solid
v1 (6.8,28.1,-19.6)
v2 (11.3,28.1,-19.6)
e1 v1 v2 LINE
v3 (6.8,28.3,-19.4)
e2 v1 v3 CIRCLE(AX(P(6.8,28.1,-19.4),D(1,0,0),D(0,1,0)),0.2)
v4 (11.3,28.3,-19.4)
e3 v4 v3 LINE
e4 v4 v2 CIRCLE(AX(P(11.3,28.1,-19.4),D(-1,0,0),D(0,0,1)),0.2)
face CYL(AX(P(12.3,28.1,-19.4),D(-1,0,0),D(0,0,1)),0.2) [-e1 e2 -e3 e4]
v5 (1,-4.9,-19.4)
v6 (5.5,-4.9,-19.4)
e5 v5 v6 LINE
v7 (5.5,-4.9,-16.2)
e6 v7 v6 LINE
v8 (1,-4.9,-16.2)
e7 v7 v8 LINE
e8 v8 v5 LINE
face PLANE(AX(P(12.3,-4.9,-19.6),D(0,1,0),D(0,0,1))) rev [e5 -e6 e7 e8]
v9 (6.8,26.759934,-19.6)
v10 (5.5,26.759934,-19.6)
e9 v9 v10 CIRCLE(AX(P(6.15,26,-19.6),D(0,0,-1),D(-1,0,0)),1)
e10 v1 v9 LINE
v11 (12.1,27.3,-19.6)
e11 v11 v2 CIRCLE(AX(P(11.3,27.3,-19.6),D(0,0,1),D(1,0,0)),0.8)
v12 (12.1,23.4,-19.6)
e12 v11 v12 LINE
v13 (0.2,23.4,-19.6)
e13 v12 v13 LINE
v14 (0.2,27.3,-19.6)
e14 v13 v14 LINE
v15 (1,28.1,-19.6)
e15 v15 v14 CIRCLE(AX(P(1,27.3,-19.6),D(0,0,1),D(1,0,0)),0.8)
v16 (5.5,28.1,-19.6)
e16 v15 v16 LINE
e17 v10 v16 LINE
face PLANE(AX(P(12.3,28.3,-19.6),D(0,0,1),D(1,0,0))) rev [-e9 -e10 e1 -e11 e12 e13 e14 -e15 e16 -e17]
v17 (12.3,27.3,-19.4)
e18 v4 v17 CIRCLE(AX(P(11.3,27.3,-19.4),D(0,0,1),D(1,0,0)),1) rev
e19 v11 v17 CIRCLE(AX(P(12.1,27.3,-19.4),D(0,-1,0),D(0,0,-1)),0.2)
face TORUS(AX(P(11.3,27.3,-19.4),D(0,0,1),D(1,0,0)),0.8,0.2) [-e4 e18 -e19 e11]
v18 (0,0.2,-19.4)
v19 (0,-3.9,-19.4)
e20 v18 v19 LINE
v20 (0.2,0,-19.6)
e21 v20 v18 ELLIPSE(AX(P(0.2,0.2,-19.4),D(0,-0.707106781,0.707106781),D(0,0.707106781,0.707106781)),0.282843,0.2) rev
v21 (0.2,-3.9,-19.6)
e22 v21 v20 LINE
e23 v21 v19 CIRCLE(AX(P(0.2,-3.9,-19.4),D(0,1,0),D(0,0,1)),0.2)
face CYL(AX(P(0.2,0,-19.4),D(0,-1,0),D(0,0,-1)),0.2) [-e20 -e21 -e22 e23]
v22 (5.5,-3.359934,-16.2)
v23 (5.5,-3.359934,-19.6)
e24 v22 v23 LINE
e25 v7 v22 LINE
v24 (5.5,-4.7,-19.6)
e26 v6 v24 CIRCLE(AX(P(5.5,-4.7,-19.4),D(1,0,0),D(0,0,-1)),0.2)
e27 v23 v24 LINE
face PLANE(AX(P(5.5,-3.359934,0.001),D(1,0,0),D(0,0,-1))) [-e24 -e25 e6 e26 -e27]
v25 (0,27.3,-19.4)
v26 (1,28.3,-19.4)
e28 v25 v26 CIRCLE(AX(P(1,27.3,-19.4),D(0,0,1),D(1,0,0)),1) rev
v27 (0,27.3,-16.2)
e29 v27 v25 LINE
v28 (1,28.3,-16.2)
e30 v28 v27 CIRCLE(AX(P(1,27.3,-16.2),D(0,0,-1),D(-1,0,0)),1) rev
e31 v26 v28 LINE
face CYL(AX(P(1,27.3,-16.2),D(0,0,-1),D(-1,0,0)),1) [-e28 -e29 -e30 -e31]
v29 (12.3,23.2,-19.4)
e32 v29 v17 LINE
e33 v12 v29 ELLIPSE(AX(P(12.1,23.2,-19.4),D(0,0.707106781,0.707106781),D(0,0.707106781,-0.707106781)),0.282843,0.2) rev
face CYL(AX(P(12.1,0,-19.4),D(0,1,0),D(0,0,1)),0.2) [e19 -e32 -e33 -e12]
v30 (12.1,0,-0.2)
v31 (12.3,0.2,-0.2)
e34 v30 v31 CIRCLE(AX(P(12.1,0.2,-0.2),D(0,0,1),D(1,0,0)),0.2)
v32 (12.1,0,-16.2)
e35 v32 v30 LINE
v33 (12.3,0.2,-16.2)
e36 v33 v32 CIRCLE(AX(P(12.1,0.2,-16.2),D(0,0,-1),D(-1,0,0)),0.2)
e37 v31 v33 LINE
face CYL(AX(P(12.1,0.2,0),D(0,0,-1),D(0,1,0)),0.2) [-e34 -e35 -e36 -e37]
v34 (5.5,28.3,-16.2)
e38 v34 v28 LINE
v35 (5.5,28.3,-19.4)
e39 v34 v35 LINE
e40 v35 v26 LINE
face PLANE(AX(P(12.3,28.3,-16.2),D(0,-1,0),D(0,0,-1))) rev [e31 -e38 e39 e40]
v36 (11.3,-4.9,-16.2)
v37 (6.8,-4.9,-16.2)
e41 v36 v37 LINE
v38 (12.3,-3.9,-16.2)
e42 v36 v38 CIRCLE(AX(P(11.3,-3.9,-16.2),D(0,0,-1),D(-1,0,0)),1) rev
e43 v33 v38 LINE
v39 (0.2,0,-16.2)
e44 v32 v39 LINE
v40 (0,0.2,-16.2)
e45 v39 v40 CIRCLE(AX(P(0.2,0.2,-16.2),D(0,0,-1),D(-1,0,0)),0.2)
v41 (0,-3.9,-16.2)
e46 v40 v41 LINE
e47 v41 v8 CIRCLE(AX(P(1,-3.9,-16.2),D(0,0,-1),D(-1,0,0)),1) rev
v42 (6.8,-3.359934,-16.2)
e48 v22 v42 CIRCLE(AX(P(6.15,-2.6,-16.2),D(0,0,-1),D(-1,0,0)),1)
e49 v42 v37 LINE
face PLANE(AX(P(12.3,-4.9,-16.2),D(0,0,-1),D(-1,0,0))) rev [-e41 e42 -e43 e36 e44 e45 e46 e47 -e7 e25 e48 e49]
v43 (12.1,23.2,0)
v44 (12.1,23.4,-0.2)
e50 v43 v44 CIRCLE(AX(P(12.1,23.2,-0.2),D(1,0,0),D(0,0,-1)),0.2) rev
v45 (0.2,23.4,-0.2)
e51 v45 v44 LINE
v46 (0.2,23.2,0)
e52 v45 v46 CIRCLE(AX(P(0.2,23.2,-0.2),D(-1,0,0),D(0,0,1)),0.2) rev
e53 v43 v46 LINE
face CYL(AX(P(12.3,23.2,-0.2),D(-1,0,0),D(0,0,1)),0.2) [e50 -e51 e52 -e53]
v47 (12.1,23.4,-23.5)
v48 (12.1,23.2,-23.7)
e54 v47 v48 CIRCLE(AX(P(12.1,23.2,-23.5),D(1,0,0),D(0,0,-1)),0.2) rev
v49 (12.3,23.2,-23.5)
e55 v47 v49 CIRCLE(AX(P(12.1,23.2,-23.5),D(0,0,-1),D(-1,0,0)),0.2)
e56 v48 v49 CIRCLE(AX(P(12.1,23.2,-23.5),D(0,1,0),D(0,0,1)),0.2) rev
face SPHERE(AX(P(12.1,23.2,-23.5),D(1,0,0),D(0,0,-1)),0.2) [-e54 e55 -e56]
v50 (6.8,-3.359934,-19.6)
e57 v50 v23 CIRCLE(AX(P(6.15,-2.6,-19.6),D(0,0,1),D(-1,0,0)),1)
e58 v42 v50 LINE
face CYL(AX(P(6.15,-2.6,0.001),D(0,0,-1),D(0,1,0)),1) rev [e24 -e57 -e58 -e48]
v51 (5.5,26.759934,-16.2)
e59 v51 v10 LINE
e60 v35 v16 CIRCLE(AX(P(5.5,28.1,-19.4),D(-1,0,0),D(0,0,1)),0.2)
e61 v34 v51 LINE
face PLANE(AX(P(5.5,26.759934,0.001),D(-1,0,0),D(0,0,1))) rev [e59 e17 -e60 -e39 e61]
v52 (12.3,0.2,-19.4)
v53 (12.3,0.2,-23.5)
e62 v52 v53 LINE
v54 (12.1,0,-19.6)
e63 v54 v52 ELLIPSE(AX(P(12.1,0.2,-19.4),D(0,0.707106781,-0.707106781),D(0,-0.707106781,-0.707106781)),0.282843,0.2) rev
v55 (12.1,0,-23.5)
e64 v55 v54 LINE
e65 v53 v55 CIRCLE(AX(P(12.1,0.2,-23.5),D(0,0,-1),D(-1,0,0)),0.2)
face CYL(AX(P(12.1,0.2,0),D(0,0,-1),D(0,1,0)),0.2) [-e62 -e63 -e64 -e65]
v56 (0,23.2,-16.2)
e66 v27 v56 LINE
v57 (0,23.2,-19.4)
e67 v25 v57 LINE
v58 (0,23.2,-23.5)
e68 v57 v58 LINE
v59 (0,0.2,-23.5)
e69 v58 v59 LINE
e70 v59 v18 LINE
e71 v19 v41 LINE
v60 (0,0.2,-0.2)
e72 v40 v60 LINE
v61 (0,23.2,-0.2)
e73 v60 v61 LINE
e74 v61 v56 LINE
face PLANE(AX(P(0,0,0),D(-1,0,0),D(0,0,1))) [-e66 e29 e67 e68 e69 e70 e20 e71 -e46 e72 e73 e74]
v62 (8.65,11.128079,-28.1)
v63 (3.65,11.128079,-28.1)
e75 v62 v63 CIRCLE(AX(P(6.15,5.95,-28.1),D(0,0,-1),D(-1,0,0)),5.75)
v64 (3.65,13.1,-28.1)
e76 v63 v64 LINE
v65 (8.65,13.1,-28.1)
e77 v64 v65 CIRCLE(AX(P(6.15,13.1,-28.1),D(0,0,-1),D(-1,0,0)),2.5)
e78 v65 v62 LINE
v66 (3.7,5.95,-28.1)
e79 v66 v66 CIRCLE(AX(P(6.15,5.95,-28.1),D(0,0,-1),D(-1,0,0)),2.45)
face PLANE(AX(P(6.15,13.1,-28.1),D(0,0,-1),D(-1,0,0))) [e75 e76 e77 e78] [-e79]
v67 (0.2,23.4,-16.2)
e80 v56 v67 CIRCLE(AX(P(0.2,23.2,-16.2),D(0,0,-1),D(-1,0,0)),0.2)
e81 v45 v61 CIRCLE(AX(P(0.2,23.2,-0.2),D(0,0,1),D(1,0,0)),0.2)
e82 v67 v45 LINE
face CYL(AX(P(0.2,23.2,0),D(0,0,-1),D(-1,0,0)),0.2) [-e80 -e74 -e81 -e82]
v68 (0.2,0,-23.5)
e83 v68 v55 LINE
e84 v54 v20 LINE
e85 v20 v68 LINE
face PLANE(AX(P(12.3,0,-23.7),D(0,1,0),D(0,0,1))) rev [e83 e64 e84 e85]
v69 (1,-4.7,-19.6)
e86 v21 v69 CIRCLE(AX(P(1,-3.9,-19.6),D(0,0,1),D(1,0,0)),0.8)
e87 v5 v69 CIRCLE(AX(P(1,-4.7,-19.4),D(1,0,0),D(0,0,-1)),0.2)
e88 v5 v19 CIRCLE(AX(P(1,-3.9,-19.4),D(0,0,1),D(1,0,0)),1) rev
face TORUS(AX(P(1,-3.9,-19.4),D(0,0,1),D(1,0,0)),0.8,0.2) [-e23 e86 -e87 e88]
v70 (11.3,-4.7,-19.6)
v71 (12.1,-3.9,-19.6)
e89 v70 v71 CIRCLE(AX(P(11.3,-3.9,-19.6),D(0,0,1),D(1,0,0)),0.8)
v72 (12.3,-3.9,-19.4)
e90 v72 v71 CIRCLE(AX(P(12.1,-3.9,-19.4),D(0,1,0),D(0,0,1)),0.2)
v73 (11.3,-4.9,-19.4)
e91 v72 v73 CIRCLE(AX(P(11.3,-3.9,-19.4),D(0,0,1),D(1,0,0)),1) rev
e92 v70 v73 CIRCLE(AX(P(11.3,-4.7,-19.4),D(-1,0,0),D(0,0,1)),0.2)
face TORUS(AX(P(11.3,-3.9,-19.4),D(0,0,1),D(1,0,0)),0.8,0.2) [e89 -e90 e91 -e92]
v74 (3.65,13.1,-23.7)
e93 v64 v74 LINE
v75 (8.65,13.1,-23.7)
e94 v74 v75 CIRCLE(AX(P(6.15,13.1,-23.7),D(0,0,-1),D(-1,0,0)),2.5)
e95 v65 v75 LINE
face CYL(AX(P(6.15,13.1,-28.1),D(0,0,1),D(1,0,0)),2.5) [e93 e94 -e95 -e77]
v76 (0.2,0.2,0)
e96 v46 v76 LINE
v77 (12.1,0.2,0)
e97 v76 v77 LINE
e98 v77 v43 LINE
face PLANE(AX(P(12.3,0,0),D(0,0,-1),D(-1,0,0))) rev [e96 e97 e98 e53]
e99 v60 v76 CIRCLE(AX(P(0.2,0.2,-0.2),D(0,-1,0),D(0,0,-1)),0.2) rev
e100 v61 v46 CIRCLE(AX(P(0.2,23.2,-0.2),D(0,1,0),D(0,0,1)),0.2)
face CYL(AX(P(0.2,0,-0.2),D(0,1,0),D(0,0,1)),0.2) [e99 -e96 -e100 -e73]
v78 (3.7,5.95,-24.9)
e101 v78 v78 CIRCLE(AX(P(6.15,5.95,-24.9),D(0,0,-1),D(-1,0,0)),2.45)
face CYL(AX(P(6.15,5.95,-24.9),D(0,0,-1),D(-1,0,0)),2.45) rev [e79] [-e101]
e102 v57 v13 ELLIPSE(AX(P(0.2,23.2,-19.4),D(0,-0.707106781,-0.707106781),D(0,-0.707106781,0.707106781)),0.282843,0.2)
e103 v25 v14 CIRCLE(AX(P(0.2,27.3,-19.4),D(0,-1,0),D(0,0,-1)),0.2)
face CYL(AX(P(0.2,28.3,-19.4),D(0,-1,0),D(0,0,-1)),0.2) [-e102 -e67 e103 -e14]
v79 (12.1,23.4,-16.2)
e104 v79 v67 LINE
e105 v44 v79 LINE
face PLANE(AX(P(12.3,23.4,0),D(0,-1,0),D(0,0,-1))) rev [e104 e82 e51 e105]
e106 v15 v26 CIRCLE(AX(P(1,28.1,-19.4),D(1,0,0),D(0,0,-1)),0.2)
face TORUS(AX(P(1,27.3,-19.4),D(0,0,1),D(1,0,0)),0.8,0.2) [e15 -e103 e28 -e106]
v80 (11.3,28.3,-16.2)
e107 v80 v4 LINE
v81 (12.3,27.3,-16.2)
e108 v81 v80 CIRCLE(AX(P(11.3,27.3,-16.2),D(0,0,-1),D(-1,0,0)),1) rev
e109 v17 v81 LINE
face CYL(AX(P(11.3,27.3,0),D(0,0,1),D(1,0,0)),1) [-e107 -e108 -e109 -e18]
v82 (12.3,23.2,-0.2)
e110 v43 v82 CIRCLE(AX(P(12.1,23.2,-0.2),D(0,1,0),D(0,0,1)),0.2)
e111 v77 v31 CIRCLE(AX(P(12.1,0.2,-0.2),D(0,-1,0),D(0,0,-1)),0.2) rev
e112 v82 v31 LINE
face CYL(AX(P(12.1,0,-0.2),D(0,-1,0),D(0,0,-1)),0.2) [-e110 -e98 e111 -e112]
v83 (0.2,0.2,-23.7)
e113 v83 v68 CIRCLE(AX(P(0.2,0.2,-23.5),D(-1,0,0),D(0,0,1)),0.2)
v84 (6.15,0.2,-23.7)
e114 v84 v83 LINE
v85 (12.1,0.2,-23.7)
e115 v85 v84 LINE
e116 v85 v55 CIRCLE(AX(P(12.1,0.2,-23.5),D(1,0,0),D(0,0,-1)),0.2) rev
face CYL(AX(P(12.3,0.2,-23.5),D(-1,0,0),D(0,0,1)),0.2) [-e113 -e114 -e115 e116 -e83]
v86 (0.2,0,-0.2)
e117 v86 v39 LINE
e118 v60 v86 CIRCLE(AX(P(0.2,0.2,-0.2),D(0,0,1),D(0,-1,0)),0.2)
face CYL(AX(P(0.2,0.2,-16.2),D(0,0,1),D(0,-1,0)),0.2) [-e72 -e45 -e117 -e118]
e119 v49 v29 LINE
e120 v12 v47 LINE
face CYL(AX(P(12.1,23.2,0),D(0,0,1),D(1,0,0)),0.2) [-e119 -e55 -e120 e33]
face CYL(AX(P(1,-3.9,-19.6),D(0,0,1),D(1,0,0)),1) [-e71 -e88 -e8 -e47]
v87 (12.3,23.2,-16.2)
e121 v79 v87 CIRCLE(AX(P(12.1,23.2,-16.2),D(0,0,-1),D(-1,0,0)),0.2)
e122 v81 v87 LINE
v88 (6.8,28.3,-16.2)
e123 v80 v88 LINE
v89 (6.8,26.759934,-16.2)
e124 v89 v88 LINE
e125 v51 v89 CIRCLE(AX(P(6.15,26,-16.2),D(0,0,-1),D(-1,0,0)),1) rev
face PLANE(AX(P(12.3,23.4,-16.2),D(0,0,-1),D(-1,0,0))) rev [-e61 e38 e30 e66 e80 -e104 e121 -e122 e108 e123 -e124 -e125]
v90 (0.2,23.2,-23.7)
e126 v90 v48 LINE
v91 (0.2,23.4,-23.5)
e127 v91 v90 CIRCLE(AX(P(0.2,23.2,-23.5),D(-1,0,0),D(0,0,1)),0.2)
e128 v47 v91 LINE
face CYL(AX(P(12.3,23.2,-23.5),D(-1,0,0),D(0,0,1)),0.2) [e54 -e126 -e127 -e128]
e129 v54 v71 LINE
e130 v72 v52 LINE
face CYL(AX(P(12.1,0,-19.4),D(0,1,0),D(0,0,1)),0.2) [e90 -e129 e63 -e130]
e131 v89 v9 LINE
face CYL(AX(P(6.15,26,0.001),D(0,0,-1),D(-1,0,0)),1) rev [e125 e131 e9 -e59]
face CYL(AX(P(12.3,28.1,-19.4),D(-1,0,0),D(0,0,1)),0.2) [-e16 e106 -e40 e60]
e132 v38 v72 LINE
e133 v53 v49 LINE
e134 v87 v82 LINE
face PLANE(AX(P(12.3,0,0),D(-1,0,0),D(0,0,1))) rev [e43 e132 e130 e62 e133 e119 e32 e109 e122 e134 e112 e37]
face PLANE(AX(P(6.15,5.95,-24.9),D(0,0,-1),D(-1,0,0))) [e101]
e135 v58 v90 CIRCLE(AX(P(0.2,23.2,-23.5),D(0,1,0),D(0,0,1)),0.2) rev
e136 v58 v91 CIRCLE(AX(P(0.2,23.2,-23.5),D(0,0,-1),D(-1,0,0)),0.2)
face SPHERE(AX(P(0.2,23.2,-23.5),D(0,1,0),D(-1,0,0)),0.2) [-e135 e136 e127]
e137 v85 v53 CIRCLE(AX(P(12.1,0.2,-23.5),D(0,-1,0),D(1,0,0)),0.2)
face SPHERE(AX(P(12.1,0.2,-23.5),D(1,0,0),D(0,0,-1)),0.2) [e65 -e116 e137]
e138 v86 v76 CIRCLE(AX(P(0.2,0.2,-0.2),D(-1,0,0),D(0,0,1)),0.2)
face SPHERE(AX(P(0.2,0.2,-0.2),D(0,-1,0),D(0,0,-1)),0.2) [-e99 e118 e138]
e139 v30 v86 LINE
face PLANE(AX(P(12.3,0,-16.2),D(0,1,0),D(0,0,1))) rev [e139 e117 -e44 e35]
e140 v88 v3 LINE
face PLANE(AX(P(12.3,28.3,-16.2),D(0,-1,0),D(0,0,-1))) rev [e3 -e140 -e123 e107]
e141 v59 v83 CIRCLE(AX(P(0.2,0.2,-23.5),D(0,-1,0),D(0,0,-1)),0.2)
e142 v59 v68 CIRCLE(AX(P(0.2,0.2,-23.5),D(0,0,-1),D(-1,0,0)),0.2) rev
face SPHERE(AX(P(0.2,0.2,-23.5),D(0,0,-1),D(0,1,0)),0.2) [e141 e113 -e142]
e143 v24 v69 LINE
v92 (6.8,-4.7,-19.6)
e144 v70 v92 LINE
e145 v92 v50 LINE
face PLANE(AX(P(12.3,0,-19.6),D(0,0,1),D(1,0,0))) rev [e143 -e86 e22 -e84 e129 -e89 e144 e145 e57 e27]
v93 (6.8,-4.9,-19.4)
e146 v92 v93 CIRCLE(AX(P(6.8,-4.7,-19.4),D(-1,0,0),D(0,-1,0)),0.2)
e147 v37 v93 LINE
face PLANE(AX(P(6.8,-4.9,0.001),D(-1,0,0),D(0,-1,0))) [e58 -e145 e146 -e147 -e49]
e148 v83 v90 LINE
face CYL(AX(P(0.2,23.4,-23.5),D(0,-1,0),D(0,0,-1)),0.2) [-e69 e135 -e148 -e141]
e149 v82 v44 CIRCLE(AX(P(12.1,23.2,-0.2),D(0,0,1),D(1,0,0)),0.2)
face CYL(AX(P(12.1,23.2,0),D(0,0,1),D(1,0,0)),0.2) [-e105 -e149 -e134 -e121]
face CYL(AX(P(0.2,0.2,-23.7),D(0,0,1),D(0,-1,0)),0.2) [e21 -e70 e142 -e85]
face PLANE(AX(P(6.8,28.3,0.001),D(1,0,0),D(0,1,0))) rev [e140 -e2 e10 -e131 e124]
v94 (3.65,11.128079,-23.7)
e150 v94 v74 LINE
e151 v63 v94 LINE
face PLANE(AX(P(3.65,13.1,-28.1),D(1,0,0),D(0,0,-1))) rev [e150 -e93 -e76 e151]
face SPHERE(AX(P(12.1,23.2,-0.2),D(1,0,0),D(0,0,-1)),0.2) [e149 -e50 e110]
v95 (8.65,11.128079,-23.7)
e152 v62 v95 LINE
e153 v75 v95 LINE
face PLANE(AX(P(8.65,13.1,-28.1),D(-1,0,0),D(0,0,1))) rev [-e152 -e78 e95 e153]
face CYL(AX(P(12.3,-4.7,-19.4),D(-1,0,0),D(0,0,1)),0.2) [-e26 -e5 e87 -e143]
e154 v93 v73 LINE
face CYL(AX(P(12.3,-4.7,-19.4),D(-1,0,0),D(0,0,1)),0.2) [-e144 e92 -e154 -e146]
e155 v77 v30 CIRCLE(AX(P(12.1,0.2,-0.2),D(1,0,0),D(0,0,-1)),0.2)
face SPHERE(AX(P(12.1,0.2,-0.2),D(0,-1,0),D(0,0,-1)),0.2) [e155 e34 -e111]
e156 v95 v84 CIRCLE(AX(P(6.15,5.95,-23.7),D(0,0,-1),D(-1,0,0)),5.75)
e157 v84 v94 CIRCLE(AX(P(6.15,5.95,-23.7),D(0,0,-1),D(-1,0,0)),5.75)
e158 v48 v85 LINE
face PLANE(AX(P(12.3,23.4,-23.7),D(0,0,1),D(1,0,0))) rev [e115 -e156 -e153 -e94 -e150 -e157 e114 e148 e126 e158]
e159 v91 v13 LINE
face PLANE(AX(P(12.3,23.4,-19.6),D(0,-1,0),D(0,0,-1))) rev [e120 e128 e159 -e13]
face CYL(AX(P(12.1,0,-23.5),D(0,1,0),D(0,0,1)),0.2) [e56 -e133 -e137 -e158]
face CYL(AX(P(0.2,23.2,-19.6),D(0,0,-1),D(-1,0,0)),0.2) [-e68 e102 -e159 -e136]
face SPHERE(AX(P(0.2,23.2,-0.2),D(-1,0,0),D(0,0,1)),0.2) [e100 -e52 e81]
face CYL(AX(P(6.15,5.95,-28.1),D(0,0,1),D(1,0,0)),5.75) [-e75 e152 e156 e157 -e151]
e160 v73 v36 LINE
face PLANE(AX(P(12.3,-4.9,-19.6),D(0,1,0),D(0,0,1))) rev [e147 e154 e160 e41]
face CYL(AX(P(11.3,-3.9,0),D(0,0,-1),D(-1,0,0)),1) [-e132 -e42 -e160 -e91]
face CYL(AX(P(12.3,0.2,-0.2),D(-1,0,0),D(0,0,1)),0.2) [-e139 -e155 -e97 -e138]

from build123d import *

# Parameters (mm, degrees)
DODANIE_WYCI_GNI_CIE1_DEPTH = 12.3
ZAOKR_GLENIE1_R             = 0.2
ZAOKR_GLENIE2_R             = 1
DODANIE_WYCI_GNI_CIE2_DEPTH = 4.4
SZKIC3_R                    = 2.45
WYTNIJ_WYCI_GNI_CIE1_DEPTH  = 3.2
WYTNIJ_WYCI_GNI_CIE2_REACH  = 38.556


with BuildPart() as part:
    # Szkic1 → Dodanie-wyciągnięcie1 (new body)
    with BuildSketch(Plane(origin=(0, 0, 0), x_dir=(0, 0, -1), z_dir=(1, 0, 0))):
        Polygon((0, 0), (0, 23.4), (16.2, 23.4), (16.2, 28.3), (19.6, 28.3), (19.6, 23.4), (23.7, 23.4), (23.7, 0), (19.6, 0), (19.6, -4.9), (16.2, -4.9), (16.2, 0), align=None)
    extrude(amount=DODANIE_WYCI_GNI_CIE1_DEPTH)

    # Zaokrąglenie1
    zaokr_glenie1_edges = [part.edges().sort_by_distance(p)[0] for p in [
        (0, 11.7, 0),
        (0, 23.4, -8.1),
        (0, 25.85, -19.6),
        (0, 23.4, -21.65),
        (0, 11.7, -23.7),
        (0, 0, -21.65),
        (0, -2.45, -19.6),
        (0, 0, -8.1),
        (12.3, -2.45, -19.6),
        (6.15, 0, 0),
        (6.15, 23.4, 0),
        (12.3, 0, -21.65),
        (6.15, 28.3, -19.6),
        (6.15, 23.4, -23.7),
        (6.15, 0, -23.7),
        (6.15, -4.9, -19.6),
        (12.3, 11.7, -23.7),
        (12.3, 23.4, -21.65),
        (12.3, 25.85, -19.6),
        (12.3, 23.4, -8.1),
        (12.3, 11.7, 0),
        (12.3, 0, -8.1),
    ]]
    fillet(zaokr_glenie1_edges, radius=ZAOKR_GLENIE1_R)

    # Zaokrąglenie2
    # the kernel refuses this fillet: 1 mm, written as the material it takes off along each edge
    with BuildSketch(Plane(origin=(11.3, 27.3, -19.6), x_dir=(0, 1, 0), z_dir=(-1, 0, 0))) as zaokr_glenie2_piece_1:
        with BuildLine():
            CenterArc((0.8, -0.2), 0.2, 0, 90)
            Line((1, -0.2), (1, 0))
            Line((1, 0), (0.8, 0))
        make_face()
    revolve(axis=Axis((11.3, 27.3, -19.6), (0, 0, -1)), revolution_arc=90, mode=Mode.SUBTRACT)
    with BuildSketch(Plane(origin=(1, 27.3, -19.6), x_dir=(-1, 0, 0), z_dir=(0, -1, 0))) as zaokr_glenie2_piece_2:
        with BuildLine():
            CenterArc((0.8, -0.2), 0.2, 0, 90)
            Line((1, -0.2), (1, 0))
            Line((1, 0), (0.8, 0))
        make_face()
    revolve(axis=Axis((1, 27.3, -19.6), (0, 0, -1)), revolution_arc=90, mode=Mode.SUBTRACT)
    with BuildSketch(Plane(origin=(11.3, -3.9, -19.6), x_dir=(1, 0, 0), z_dir=(0, 1, 0))) as zaokr_glenie2_piece_3:
        with BuildLine():
            CenterArc((0.8, -0.2), 0.2, 0, 90)
            Line((1, -0.2), (1, 0))
            Line((1, 0), (0.8, 0))
        make_face()
    revolve(axis=Axis((11.3, -3.9, -19.6), (0, 0, -1)), revolution_arc=90, mode=Mode.SUBTRACT)
    with BuildSketch(Plane(origin=(1, -3.9, -19.6), x_dir=(0, -1, 0), z_dir=(1, 0, 0))) as zaokr_glenie2_piece_4:
        with BuildLine():
            CenterArc((0.8, -0.2), 0.2, 0, 90)
            Line((1, -0.2), (1, 0))
            Line((1, 0), (0.8, 0))
        make_face()
    revolve(axis=Axis((1, -3.9, -19.6), (0, 0, -1)), revolution_arc=90, mode=Mode.SUBTRACT)
    with BuildSketch(Plane(origin=(12.3, -4.9, -19.6), x_dir=(-1, 0, 0), z_dir=(0, 0, 1)), Plane(origin=(0, -4.9, -19.6), x_dir=(0, 1, 0), z_dir=(0, 0, 1)), Plane(origin=(0, 28.3, -13.7), x_dir=(0, -1, 0), z_dir=(0, 0, -1)), Plane(origin=(12.3, 28.3, -13.7), x_dir=(-1, 0, 0), z_dir=(0, 0, -1))) as zaokr_glenie2_piece_5:
        with BuildLine():
            CenterArc((ZAOKR_GLENIE2_R, -ZAOKR_GLENIE2_R), ZAOKR_GLENIE2_R, 90, 90)
            Line((0, -ZAOKR_GLENIE2_R), (0, 0))
            Line((0, 0), (ZAOKR_GLENIE2_R, 0))
        make_face()
    extrude(amount=5.9, mode=Mode.SUBTRACT)

    # Szkic2 → Dodanie-wyciągnięcie2 (add)
    with BuildSketch(Plane(origin=(0, 0, -23.7), x_dir=(-1, 0, 0), z_dir=(0, 0, -1))):
        with BuildLine():
            Line((-3.65, 13.1), (-3.65, 11.128078794))
            ThreePointArc((-3.65, 11.128078794), (-6.15, 0.2), (-8.65, 11.128078794))
            Line((-8.65, 11.128078794), (-8.65, 13.1))
            ThreePointArc((-8.65, 13.1), (-6.15, 15.6), (-3.65, 13.1))
        make_face()
    extrude(amount=DODANIE_WYCI_GNI_CIE2_DEPTH)

    # Szkic3 → Wytnij-wyciągnięcie1 (cut)
    with BuildSketch(Plane(origin=(0, 0, -28.1), x_dir=(-1, 0, 0), z_dir=(0, 0, -1))):
        with Locations((-6.15, 5.95)):
            Circle(SZKIC3_R)
    extrude(amount=-WYTNIJ_WYCI_GNI_CIE1_DEPTH, mode=Mode.SUBTRACT)

    # Szkic5 → Wytnij-wyciągnięcie2 (cut, up to next)
    with BuildSketch(Plane(origin=(0, 0, -19.6), x_dir=(-1, 0, 0), z_dir=(0, 0, -1)), mode=Mode.PRIVATE) as wytnij_wyci_gni_cie2_sk1:
        with BuildLine():
            Line((-5.5, 26.759934208), (-5.5, 28.3))
            Line((-5.5, 28.3), (-6.8, 28.3))
            Line((-6.8, 28.3), (-6.8, 26.759934208))
            ThreePointArc((-6.8, 26.759934208), (-6.15, 25), (-5.5, 26.759934208))
        make_face()
    wytnij_wyci_gni_cie2_tool1 = extrude(wytnij_wyci_gni_cie2_sk1.sketch, amount=-WYTNIJ_WYCI_GNI_CIE2_REACH, mode=Mode.PRIVATE) & part.part
    wytnij_wyci_gni_cie2 = wytnij_wyci_gni_cie2_tool1.solids().sort_by_distance((6.15, 26.584181, -19.6))[0]
    add(wytnij_wyci_gni_cie2, mode=Mode.SUBTRACT)

    # Lustro1: Wytnij-wyciągnięcie2 across plane
    add(wytnij_wyci_gni_cie2.mirror(Plane.ZX.offset(11.7)), mode=Mode.SUBTRACT)


solid = part.part
